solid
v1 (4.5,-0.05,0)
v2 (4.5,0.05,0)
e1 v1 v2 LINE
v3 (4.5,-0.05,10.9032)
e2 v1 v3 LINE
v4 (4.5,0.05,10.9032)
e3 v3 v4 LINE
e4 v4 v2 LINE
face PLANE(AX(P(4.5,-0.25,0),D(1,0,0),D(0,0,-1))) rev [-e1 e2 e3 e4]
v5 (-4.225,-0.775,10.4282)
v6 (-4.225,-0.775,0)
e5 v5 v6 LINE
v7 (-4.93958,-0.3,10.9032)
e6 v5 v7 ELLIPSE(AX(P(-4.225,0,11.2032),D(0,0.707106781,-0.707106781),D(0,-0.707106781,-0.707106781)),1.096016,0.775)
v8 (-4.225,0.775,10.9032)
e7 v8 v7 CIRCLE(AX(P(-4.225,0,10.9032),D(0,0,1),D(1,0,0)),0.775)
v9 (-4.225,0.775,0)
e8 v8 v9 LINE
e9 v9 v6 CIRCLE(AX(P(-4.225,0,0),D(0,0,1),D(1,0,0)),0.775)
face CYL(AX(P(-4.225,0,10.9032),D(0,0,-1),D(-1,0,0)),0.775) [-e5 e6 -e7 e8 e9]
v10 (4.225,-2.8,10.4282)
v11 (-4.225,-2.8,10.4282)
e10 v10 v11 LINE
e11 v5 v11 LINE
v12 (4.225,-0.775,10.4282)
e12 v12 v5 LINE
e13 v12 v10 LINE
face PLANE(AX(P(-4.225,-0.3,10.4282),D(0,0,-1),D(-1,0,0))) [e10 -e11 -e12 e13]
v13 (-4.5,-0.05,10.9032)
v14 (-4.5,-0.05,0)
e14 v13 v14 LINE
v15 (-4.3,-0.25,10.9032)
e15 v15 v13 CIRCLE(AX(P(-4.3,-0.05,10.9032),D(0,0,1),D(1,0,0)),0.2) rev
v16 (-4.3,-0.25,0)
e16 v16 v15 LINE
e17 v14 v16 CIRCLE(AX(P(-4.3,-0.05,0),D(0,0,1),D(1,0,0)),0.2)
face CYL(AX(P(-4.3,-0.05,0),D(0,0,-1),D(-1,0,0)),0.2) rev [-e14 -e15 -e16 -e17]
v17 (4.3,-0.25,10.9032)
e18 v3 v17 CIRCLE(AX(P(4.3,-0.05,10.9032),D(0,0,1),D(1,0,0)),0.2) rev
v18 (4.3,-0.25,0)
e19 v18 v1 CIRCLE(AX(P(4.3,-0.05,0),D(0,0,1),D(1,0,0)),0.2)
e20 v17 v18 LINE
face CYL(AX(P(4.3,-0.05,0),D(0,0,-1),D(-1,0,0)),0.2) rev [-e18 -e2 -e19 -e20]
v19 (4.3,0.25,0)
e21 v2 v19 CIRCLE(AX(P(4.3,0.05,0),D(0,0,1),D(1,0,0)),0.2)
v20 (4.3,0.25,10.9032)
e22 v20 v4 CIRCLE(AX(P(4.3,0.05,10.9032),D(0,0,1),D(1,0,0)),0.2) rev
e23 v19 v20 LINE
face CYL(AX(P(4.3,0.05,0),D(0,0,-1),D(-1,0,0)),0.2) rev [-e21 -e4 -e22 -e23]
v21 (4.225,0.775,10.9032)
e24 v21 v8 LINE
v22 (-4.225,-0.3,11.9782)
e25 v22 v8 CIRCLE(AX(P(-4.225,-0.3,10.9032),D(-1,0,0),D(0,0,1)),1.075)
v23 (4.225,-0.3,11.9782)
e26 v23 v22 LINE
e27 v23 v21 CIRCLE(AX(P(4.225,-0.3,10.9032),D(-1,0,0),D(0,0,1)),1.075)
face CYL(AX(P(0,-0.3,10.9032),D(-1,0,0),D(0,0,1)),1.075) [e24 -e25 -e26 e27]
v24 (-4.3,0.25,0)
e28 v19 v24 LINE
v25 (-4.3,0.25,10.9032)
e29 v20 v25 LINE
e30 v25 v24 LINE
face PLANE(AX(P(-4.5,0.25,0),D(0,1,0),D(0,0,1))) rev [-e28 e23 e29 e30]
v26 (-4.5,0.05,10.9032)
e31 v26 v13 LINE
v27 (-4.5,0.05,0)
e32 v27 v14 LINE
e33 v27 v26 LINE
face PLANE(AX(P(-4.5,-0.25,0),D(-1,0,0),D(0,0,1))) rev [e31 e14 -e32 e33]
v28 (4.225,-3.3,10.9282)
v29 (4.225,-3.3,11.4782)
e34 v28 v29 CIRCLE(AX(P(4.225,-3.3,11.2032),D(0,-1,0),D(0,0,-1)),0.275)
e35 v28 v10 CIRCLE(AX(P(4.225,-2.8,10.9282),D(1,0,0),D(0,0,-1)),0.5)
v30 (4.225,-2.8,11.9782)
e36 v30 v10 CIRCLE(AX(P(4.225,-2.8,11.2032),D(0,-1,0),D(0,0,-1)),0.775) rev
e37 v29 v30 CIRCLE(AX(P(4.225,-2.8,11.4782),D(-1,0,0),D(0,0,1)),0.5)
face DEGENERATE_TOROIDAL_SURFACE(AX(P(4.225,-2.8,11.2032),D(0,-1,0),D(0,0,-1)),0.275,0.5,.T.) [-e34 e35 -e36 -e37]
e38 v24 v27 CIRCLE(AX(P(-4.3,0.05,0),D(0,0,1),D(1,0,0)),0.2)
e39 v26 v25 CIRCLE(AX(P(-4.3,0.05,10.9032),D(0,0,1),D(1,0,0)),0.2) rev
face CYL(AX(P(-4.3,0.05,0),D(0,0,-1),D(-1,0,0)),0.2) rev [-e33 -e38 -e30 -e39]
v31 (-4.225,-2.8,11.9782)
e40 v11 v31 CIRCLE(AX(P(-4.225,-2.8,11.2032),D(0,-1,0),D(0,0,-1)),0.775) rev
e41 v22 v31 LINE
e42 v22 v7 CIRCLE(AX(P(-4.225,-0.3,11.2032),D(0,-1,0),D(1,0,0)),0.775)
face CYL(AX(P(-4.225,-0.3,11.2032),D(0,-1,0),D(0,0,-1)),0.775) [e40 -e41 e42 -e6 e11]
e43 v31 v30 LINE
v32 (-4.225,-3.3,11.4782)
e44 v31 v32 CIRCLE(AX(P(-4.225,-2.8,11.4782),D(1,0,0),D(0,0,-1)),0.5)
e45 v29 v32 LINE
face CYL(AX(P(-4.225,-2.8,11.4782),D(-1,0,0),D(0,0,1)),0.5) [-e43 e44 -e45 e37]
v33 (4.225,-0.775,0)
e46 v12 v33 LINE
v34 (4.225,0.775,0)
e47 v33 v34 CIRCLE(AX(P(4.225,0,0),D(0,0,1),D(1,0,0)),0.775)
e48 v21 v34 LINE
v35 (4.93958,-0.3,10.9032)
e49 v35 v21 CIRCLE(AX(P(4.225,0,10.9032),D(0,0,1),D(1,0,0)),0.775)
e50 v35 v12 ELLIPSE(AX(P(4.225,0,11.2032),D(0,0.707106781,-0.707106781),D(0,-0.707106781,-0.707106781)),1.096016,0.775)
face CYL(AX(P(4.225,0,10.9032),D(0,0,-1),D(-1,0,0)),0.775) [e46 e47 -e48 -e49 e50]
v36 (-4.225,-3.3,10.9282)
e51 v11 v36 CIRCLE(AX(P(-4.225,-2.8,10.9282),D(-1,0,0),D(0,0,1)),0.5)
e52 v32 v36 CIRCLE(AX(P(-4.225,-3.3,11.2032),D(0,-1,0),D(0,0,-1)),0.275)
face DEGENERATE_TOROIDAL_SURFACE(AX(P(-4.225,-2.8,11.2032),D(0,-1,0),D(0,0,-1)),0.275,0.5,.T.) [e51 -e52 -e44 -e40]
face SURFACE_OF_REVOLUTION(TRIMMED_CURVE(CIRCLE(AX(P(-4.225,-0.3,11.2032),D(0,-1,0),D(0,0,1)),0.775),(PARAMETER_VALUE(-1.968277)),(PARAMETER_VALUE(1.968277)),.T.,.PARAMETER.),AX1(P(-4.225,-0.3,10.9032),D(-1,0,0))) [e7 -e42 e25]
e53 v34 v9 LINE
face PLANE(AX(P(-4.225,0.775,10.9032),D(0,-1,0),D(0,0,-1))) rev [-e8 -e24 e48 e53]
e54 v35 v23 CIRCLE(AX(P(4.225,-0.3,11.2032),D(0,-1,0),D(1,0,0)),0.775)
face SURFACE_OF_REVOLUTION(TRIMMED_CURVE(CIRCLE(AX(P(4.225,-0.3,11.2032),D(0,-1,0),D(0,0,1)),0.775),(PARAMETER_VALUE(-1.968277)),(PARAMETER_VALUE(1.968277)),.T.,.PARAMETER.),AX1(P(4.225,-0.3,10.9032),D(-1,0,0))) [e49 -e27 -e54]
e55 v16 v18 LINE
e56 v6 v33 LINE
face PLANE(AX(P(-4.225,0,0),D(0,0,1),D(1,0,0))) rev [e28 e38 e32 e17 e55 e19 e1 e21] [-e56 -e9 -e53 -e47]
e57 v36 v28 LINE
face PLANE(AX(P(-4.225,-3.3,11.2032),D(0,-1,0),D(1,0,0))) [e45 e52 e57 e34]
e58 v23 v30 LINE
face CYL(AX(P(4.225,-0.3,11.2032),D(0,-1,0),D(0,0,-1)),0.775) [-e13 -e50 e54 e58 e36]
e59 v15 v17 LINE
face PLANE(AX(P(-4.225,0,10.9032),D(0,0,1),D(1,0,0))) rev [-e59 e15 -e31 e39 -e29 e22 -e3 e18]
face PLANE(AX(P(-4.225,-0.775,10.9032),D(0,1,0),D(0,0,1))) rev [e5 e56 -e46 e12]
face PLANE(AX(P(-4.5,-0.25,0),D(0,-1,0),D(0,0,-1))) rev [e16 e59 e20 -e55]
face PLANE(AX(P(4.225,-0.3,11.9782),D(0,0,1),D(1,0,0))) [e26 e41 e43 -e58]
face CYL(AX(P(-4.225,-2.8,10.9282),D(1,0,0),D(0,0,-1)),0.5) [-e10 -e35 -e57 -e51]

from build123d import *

# Parameters (mm, degrees)
BOSS_EXTRUDE1_DEPTH = 10.9032
SKETCH2_W           = 9
SKETCH2_H           = 0.5
CUT_EXTRUDE1_DEPTH  = 13.01999980199667
FILLET1_R           = 0.2
SWEEP1_START        = -3.3
SWEEP1_DEPTH        = 3.05
SWEEP1_2_ANGLE      = 90
FILLET2_R           = 0.5


with BuildPart() as part:
    # Sketch1 → Boss-Extrude1 (new body)
    with BuildSketch(Plane.XY):
        with BuildLine():
            Line((-4.225, 0.7750000000000001), (4.225, 0.7750000000000001))
            ThreePointArc((4.225, 0.7750000000000001), (5, 0), (4.225, -0.7750000000000001))
            Line((4.225, -0.7750000000000001), (-4.225, -0.7750000000000001))
            ThreePointArc((-4.225, -0.7750000000000001), (-5, 9e-17), (-4.225, 0.7750000000000001))
        make_face()
    extrude(amount=BOSS_EXTRUDE1_DEPTH)

    # Sketch2 → Cut-Extrude1 (cut, through all)
    with BuildSketch(Plane.XY.offset(10.9032)):
        Rectangle(SKETCH2_W, SKETCH2_H)
    extrude(amount=-CUT_EXTRUDE1_DEPTH, mode=Mode.SUBTRACT)

    # Fillet1
    fillet1_edges = [part.edges().sort_by_distance(p)[0] for p in [
        (4.500000000000003, 0.2500000000000001, 5.4516),
        (4.500000000000003, -0.2499999999999999, 5.4516),
        (-4.499999999999997, -0.2499999999999999, 5.4516),
        (-4.499999999999997, 0.2500000000000001, 5.4516),
    ]]
    fillet(fillet1_edges, radius=FILLET1_R)

    # Sweep1: read off the stored shape, not the designer's step
    # Sweep1 outline → Sweep1 (add)
    with BuildSketch(Plane(origin=(0, 0, 0), x_dir=(1, 0, 0), z_dir=(0, 1, 0)).offset(SWEEP1_START)):
        with BuildLine():
            Line((-4.225, -11.9782), (4.225, -11.9782))
            ThreePointArc((4.225, -11.9782), (5, -11.2032), (4.225, -10.4282))
            Line((4.225, -10.4282), (-4.225, -10.4282))
            ThreePointArc((-4.225, -10.4282), (-5, -11.2032), (-4.225, -11.9782))
        make_face()
    extrude(amount=SWEEP1_DEPTH)

    # Sweep1 2 outline → Sweep1 2 (revolve)
    with BuildSketch(Plane(origin=(0, -0.3, 10.9032), x_dir=(0, 1, -1.44e-15), z_dir=(0, -1.44e-15, -1))):
        with BuildLine():
            Line((0, 4.939580296), (0, -4.939580296))
            add(Edge.make_bspline(
                [(0, -4.939580296), (0.0519570394689895, -4.961393256983593), (0.10841554643003581, -4.979542137191699), (0.1692061790231751, -4.992872607462927), (0.23352242585972577, -5.000000001245932), (0.538087621369197, -4.999999995537749), (0.8228689184127496, -4.905109045106682), (1.0076156687544926, -4.675143876063141), (1.075000000000001, -4.4268164646885895), (1.075, -4.225)],
                knots=[1.5386603530075902, 1.5386603530075902, 1.5386603530075902, 1.5386603530075902, 1.5386603530075902, 1.5386603530075902, 1.968277128944731, 1.968277128944731, 1.968277128944731, 1.968277128944731, 3.5069374819523116, 3.5069374819523116, 3.5069374819523116, 3.5069374819523116, 3.5069374819523116, 3.5069374819523116], degree=5, weights=[1, 0.9999999999999993, 1.0001144222703127, 1.000064472262904, 1.0000000000000007, 1.0000000000000002, 0.9635119774531175, 0.9749056251717576, 1.000000000000001, 1]))
            Line((1.075, -4.225), (1.075, 4.225))
            add(Edge.make_bspline(
                [(1.075, 4.225), (1.0750000000000006, 4.426816468221435), (1.0076156662304492, 4.6751438856768095), (0.8228689080824526, 4.905109057133026), (0.5380876027644639, 5.000000001939648), (0.23352240972853552, 4.999999999458421), (0.16920616758934218, 4.992872604955472), (0.10841553935261468, 4.97954213491664), (0.05195703621157381, 4.961393255616055), (0, 4.939580296)],
                knots=[4.744524927237428, 4.744524927237428, 4.744524927237428, 4.744524927237428, 4.744524927237428, 4.744524927237428, 6.283185307179587, 6.283185307179587, 6.283185307179587, 6.283185307179587, 6.712802056182165, 6.712802056182165, 6.712802056182165, 6.712802056182165, 6.712802056182165, 6.712802056182165], degree=5, weights=[1, 0.9999999999999987, 0.9749056227861467, 0.9635119748925262, 1.0000000000000018, 1.0000000000000044, 1.0000644722550744, 1.0001144222464367, 0.999999999999996, 1]))
        make_face()
    revolve(axis=Axis((0, -0.3, 10.9032), (1, 0, 0)), revolution_arc=SWEEP1_2_ANGLE)

    # Fillet2
    fillet2_edges = [part.edges().sort_by_distance(p)[0] for p in [
        (-4.999999999999999, -3.3, 11.203199999999999),
        (0, -3.3, 10.4282),
        (4.999999999999999, -3.3, 11.203199999999999),
        (0, -3.3, 11.9782),
    ]]
    fillet(fillet2_edges, radius=FILLET2_R)


solid = part.part
